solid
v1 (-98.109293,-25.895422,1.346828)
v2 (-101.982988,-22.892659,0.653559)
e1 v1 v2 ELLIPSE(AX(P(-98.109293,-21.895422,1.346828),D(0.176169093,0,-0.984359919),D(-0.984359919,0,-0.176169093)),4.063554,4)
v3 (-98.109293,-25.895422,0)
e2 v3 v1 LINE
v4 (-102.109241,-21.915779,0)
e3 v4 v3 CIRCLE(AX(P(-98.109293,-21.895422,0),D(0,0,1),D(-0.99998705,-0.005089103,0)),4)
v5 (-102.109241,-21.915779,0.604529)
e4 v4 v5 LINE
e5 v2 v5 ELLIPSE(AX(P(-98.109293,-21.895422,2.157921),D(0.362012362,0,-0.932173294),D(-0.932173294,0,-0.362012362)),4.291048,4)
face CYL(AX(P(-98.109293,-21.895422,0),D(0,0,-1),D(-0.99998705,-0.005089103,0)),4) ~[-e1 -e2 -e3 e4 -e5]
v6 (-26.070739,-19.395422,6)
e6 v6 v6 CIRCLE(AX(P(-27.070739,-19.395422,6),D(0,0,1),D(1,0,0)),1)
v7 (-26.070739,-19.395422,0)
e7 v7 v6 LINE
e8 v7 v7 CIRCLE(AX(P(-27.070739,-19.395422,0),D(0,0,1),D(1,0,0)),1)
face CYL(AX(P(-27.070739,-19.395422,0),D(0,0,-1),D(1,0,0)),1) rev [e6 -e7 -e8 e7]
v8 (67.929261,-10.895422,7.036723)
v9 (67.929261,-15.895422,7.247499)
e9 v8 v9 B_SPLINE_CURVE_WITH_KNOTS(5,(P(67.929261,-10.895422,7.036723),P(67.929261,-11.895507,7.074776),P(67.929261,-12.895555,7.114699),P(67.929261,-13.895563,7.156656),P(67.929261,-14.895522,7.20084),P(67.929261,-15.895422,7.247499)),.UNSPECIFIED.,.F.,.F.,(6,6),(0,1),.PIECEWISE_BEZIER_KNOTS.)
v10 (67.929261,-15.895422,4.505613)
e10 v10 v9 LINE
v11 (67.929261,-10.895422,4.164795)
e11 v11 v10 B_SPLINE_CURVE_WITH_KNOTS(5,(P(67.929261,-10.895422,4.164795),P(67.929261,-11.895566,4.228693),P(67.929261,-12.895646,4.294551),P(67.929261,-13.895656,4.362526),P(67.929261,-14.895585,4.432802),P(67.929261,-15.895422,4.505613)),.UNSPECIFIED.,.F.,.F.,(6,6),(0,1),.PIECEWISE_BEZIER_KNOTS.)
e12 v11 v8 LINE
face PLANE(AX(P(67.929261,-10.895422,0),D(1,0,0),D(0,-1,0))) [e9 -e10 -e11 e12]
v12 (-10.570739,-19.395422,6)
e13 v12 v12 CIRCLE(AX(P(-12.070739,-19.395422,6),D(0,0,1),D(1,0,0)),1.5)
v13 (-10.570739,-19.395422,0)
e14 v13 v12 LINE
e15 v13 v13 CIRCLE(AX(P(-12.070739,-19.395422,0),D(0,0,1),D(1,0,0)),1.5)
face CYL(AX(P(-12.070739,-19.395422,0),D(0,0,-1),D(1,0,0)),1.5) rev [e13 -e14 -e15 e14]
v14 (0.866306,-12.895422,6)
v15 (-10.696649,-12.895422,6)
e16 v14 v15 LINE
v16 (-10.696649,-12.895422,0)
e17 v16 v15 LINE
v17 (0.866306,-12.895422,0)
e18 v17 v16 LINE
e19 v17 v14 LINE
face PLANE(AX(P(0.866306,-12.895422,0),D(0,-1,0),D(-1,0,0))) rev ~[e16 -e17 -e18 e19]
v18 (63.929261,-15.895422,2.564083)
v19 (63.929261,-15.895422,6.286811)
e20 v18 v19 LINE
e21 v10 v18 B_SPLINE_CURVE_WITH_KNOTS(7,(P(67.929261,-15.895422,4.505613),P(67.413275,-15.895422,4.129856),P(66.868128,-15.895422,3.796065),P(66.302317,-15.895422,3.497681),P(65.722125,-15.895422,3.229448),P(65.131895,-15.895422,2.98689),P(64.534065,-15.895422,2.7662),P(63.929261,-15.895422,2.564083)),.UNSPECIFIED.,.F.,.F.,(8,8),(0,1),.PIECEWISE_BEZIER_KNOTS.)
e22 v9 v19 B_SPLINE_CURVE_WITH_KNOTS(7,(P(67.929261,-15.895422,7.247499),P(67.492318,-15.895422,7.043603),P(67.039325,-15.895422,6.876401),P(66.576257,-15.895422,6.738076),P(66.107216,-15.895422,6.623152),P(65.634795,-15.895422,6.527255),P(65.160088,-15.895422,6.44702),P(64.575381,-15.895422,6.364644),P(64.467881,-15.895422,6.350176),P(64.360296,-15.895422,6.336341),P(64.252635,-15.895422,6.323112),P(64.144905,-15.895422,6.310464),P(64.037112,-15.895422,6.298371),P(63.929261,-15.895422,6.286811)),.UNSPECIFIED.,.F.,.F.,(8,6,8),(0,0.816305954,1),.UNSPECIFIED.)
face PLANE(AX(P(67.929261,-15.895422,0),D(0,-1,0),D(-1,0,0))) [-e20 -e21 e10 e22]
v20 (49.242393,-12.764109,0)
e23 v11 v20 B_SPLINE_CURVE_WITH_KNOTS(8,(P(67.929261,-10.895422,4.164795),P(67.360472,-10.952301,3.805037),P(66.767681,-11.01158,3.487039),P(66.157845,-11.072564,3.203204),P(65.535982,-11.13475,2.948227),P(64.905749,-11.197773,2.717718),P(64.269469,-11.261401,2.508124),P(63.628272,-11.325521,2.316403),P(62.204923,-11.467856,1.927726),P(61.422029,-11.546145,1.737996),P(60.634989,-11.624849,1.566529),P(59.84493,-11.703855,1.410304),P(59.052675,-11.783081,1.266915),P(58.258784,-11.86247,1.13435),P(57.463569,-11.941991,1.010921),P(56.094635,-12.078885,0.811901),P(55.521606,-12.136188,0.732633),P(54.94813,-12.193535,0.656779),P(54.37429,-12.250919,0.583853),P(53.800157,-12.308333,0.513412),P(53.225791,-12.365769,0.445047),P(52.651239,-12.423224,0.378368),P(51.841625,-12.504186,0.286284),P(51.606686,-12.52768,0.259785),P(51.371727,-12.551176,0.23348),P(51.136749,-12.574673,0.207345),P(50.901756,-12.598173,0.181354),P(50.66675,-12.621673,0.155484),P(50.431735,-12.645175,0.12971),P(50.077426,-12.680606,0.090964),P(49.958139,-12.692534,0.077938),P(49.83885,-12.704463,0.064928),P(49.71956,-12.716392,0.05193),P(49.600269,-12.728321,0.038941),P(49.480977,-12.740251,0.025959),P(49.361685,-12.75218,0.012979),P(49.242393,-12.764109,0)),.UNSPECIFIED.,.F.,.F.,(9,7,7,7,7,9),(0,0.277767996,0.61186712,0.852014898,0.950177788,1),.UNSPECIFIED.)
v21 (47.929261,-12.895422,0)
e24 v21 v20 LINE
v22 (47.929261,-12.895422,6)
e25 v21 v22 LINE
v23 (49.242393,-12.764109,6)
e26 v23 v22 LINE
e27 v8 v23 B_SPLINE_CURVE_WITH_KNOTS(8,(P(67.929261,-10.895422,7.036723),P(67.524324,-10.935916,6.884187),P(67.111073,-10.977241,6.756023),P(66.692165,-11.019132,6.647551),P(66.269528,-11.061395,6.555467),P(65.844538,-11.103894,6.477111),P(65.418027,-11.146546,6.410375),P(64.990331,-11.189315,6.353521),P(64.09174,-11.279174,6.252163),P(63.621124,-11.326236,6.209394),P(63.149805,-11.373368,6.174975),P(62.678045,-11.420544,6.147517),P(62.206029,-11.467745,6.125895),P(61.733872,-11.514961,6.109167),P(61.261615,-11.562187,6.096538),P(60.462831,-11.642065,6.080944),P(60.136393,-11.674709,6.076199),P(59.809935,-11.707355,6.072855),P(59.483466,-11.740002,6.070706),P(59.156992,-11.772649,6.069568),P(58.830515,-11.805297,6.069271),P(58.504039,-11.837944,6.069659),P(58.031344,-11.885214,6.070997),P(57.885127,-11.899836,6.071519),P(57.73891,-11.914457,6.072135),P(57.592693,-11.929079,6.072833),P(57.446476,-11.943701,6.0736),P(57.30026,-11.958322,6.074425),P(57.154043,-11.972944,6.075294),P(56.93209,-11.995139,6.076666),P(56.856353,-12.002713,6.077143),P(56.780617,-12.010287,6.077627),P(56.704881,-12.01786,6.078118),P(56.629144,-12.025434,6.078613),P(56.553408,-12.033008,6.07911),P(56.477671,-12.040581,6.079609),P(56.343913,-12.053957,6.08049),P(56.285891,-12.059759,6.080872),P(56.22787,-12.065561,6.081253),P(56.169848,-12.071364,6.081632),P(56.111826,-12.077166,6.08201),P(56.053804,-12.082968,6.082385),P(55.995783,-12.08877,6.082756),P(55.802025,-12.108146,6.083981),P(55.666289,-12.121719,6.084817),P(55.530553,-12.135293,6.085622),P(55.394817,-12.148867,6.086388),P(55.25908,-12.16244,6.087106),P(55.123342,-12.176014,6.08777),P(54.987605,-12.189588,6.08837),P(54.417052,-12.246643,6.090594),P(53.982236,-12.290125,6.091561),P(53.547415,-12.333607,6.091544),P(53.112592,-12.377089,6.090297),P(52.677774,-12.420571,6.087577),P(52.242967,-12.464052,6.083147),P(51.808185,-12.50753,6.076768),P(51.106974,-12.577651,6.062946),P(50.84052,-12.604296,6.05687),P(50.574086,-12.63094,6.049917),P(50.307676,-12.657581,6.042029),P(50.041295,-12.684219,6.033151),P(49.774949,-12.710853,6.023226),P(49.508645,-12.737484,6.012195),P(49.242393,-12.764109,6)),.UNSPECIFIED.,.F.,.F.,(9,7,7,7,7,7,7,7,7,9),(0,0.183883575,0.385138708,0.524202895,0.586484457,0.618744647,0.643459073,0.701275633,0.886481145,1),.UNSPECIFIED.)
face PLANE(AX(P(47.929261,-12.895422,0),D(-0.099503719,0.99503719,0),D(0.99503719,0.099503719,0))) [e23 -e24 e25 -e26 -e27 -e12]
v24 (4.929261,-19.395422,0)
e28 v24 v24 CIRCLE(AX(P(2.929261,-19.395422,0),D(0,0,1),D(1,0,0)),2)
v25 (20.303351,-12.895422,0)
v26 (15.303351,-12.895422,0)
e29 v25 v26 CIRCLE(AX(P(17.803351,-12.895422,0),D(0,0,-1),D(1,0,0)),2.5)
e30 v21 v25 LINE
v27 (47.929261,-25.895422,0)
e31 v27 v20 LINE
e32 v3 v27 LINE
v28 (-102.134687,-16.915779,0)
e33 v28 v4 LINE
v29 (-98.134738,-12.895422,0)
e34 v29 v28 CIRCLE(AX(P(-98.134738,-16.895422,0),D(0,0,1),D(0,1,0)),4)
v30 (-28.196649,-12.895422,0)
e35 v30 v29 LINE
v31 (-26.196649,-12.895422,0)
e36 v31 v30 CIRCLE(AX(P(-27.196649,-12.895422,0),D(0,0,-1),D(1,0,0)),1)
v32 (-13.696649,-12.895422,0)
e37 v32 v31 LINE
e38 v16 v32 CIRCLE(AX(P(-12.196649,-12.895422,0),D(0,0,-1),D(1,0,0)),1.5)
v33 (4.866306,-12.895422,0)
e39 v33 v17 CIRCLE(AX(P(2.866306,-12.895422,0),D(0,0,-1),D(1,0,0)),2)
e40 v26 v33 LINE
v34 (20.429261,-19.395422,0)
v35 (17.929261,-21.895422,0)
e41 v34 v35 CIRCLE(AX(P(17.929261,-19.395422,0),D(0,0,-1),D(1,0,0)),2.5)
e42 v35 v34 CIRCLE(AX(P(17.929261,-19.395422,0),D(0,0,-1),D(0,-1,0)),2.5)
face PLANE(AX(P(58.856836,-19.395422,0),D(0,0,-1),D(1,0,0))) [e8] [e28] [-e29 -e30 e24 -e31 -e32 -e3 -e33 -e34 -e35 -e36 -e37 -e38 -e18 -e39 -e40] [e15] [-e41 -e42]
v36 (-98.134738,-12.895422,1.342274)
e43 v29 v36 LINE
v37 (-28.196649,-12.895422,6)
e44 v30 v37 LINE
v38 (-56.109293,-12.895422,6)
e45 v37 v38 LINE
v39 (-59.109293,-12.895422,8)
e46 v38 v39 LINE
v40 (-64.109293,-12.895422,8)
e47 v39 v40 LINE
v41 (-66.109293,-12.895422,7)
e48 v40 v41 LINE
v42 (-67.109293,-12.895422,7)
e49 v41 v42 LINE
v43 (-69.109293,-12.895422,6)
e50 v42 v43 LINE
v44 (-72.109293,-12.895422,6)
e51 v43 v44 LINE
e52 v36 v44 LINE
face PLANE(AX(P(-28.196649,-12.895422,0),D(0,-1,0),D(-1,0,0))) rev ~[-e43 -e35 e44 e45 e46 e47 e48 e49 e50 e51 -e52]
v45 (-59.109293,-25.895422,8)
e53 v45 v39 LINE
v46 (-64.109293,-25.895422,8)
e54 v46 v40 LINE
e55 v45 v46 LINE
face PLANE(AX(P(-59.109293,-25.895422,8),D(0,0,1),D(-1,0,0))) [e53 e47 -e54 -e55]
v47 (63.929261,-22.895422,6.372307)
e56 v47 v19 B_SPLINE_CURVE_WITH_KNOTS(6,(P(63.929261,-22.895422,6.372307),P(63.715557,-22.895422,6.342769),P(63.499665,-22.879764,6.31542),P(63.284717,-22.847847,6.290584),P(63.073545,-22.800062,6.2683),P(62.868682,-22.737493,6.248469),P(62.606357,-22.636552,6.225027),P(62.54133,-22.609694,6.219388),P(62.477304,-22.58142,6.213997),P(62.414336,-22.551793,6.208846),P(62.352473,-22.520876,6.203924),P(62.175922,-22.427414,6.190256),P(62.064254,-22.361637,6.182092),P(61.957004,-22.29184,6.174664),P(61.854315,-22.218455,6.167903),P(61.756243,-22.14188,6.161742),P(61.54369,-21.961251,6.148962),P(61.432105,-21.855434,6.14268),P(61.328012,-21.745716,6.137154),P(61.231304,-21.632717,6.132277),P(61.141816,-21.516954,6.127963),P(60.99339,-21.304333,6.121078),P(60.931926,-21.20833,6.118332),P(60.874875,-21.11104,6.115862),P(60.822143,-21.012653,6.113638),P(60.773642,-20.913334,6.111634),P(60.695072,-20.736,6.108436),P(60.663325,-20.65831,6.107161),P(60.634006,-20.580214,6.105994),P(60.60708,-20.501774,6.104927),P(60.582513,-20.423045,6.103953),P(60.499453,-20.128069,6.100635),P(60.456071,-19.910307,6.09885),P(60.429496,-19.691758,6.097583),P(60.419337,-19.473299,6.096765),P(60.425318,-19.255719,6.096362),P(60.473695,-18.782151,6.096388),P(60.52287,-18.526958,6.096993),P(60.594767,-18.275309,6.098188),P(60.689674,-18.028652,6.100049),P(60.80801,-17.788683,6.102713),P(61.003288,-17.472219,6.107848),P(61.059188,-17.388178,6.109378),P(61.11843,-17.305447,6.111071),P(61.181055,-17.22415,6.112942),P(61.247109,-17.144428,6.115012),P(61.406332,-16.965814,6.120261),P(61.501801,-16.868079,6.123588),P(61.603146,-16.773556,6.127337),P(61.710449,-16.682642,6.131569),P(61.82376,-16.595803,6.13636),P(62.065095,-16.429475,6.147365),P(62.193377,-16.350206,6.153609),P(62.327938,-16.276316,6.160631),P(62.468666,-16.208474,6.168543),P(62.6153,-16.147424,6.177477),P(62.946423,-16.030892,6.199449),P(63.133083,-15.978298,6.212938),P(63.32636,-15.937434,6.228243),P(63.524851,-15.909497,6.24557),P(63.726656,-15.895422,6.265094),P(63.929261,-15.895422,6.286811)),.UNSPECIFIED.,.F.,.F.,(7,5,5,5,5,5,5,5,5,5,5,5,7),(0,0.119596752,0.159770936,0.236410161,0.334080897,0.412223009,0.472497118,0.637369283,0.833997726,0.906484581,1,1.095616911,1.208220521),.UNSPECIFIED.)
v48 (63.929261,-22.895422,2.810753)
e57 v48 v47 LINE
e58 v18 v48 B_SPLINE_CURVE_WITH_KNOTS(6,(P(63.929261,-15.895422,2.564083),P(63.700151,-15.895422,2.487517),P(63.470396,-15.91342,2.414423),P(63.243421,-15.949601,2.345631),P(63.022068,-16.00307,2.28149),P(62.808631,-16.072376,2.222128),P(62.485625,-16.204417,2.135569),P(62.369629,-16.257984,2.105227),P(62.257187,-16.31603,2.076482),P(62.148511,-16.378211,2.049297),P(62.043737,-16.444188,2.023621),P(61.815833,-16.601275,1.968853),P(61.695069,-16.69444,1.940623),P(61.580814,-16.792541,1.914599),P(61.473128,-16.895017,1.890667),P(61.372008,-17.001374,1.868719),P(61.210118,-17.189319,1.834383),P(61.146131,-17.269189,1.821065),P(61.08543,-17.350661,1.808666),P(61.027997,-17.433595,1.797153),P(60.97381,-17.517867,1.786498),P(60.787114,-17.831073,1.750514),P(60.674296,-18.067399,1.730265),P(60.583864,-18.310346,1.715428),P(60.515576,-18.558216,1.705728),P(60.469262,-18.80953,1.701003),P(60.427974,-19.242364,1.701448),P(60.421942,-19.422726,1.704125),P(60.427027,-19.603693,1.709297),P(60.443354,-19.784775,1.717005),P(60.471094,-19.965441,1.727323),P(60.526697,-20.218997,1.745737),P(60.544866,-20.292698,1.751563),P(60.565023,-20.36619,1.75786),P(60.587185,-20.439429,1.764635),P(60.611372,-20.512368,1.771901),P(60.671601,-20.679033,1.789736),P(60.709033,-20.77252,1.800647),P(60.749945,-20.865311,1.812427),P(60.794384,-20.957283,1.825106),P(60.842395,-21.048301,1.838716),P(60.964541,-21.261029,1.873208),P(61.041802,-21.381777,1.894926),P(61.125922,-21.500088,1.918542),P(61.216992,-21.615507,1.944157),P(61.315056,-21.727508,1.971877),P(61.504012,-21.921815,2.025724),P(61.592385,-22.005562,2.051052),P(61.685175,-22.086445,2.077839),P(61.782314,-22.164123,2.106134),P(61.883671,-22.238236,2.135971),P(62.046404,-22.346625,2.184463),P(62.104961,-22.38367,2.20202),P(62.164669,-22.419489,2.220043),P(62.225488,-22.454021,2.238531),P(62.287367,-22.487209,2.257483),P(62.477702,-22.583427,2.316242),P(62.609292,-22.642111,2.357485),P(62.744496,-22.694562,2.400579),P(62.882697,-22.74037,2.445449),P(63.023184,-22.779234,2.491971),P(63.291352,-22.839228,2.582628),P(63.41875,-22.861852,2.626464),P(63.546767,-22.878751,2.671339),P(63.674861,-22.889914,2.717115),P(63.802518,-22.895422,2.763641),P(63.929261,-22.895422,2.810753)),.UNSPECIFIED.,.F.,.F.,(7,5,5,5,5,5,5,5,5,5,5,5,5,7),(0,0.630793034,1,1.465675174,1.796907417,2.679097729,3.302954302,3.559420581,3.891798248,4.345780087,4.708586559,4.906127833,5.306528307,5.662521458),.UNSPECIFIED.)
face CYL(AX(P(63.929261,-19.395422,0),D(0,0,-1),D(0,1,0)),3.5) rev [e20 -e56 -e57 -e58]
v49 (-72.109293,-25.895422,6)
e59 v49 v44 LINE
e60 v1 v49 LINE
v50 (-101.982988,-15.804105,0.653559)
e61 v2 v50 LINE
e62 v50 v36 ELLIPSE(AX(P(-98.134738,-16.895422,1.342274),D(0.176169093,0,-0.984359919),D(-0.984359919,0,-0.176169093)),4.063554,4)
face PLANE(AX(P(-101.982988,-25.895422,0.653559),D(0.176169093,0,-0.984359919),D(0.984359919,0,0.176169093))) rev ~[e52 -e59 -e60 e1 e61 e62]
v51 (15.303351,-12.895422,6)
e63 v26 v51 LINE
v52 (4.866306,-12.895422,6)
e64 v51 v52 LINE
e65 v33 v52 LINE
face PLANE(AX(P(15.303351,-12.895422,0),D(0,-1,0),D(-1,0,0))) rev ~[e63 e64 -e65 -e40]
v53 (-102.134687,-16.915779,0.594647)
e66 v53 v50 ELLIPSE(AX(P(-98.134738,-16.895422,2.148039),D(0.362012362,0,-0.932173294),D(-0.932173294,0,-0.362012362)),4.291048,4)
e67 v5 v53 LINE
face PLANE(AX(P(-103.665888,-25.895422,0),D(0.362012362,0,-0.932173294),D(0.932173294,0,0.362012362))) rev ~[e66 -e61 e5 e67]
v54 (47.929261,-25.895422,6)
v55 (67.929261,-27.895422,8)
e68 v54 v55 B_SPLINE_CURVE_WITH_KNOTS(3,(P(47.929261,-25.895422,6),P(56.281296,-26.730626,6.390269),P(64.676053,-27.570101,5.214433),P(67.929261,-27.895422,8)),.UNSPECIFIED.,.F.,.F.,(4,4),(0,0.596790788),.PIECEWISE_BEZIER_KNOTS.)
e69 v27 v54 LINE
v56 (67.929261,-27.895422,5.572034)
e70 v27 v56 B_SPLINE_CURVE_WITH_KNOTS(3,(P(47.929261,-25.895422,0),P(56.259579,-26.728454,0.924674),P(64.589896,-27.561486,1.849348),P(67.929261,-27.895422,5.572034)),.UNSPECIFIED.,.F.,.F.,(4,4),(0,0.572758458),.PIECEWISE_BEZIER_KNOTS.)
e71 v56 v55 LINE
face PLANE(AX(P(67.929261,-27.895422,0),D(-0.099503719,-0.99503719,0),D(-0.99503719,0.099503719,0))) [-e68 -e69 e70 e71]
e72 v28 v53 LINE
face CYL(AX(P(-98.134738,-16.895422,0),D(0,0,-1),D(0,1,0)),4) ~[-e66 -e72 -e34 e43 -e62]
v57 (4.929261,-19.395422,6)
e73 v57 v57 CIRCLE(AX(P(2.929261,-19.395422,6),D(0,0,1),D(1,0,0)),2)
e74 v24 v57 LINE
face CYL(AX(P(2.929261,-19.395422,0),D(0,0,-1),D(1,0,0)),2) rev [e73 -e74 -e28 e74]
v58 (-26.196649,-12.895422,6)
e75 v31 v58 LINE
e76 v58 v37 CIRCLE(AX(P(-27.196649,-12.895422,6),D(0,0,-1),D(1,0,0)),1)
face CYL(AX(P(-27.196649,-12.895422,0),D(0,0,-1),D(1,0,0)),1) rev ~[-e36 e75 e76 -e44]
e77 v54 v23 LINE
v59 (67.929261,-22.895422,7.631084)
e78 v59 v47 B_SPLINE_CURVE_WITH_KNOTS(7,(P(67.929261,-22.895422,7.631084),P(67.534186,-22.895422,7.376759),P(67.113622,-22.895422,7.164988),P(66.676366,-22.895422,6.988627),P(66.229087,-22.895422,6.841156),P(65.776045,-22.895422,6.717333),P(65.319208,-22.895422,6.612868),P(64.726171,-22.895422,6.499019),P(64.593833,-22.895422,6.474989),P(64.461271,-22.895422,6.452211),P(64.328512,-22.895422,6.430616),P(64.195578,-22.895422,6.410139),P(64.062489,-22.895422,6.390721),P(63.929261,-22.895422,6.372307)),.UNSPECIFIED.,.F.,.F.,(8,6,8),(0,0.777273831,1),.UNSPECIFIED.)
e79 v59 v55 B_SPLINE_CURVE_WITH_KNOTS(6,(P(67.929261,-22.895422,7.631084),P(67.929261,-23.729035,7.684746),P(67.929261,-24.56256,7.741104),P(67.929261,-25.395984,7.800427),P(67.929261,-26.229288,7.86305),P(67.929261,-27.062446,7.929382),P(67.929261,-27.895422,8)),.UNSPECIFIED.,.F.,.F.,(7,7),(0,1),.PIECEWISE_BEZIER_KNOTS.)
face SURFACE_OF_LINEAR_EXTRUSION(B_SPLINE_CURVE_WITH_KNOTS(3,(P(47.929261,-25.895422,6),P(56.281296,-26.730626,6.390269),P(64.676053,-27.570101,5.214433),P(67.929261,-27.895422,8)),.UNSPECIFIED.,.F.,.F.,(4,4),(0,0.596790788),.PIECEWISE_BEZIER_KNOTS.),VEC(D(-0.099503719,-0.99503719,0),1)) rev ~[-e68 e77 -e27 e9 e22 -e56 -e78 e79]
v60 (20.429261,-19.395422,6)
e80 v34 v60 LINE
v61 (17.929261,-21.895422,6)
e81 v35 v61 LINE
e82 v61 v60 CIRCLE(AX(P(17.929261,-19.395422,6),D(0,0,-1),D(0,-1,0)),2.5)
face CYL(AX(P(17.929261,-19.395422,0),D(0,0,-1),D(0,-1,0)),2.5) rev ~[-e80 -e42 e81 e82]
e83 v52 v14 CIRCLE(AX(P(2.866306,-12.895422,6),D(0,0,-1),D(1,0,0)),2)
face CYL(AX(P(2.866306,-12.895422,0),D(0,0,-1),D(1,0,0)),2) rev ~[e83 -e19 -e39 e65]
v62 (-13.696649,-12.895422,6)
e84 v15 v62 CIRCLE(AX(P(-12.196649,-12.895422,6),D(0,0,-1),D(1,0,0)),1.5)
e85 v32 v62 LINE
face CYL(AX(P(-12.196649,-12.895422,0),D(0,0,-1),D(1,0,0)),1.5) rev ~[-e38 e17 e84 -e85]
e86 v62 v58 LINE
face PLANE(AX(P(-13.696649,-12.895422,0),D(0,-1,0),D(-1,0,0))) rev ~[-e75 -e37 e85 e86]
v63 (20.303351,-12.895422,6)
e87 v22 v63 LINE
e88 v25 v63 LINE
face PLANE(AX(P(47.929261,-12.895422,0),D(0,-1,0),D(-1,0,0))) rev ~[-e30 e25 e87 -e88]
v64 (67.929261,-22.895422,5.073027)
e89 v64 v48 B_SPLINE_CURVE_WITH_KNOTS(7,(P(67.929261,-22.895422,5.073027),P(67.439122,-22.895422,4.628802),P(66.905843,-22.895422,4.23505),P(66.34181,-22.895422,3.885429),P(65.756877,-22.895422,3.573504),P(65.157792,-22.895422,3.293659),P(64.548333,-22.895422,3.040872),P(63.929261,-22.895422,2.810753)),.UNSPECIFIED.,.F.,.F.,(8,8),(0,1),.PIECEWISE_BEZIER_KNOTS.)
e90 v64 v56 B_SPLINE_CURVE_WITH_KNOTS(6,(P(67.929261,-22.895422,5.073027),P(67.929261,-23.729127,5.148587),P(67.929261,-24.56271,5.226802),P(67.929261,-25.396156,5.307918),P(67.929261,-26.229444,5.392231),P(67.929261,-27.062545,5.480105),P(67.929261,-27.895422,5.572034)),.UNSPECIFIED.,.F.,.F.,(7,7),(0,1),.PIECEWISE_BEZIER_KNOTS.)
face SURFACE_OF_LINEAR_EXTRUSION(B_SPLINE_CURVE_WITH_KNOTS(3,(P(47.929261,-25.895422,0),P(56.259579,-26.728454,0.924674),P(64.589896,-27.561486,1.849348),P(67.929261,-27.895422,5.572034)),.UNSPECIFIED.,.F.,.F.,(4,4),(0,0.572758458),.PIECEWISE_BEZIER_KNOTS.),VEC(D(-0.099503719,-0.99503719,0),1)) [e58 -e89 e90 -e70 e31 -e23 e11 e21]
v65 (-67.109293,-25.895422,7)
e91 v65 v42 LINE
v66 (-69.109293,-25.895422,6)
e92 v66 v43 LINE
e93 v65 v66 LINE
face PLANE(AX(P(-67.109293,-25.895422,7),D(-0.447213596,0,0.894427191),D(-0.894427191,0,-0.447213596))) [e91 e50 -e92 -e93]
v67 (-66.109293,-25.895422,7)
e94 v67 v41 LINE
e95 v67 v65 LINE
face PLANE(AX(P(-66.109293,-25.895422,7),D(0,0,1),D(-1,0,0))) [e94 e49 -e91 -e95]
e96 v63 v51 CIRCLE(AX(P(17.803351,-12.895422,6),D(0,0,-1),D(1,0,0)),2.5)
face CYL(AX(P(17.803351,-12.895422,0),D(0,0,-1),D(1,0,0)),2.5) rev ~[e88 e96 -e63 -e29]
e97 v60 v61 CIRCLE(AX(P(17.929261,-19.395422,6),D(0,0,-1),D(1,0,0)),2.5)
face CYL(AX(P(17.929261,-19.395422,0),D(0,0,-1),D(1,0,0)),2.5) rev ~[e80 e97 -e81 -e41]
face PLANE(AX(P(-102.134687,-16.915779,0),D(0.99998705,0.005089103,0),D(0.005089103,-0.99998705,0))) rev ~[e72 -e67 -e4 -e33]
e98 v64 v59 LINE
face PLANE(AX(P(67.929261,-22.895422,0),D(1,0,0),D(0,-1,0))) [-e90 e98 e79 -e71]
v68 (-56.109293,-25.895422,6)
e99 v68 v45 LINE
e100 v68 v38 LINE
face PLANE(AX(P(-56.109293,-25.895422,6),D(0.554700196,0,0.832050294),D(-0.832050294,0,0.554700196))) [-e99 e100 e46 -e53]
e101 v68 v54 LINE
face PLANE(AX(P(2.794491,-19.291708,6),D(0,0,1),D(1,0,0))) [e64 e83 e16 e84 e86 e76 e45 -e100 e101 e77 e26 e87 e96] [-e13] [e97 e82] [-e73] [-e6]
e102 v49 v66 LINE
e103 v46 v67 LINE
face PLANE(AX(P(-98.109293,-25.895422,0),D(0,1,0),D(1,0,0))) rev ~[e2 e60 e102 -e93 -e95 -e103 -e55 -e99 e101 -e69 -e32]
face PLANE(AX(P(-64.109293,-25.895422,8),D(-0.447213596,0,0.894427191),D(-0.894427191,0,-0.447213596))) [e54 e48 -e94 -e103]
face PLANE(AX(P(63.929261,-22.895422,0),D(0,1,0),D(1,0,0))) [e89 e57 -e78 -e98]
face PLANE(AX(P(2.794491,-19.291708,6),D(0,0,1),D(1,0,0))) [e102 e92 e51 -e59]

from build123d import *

# Parameters (mm, degrees)
F0_R     = 1
F0_R_2   = 1.5
F0_R_3   = 2
F1_DEPTH = 6
F3_DEPTH = 8
F5_DEPTH = 25
F7_DEPTH = 25
F9_DEPTH = 13


# Not quite as in the source:
# - a feature names something its author has since deleted; it is built from what else it names


with BuildPart() as f1:
    # F0 (on Top) → F1 (new body)
    with BuildSketch(Plane.XY):
        with BuildLine():
            Line((-42.1966487169, -12.8954221606), (-42.1966487169, -25.8954221606))
            Line((-42.1966487169, -25.8954221606), (17.9292613268, -25.8954221606))
            Line((17.9292613268, -25.8954221606), (47.9292613268, -25.8954221606))
            Line((47.9292613268, -25.8954221606), (47.9292613268, -12.8954221606))
            Line((47.9292613268, -12.8954221606), (20.3033512831, -12.8954221606))
            ThreePointArc((20.3033512831, -12.8954221606), (17.8033512831, -15.3954221606), (15.3033512831, -12.8954221606))
            Line((15.3033512831, -12.8954221606), (4.8663063049, -12.8954221606))
            ThreePointArc((4.8663063049, -12.8954221606), (2.8663063049, -14.8954221606), (0.8663063049, -12.8954221606))
            Line((0.8663063049, -12.8954221606), (-10.6966487169, -12.8954221606))
            ThreePointArc((-10.6966487169, -12.8954221606), (-12.1966487169, -14.3954221606), (-13.6966487169, -12.8954221606))
            Line((-13.6966487169, -12.8954221606), (-26.1966487169, -12.8954221606))
            ThreePointArc((-26.1966487169, -12.8954221606), (-27.1966487169, -13.8954221606), (-28.1966487169, -12.8954221606))
            Line((-28.1966487169, -12.8954221606), (-42.1966487169, -12.8954221606))
        make_face()
        with Locations((-27.0707386732, -19.3954221606)):
            Circle(F0_R, mode=Mode.SUBTRACT)
        with Locations((-12.0707386732, -19.3954221606)):
            Circle(F0_R_2, mode=Mode.SUBTRACT)
        with Locations((2.9292613268, -19.3954221606)):
            Circle(F0_R_3, mode=Mode.SUBTRACT)
        with BuildLine():
            ThreePointArc((20.4292613268, -19.3954221606), (19.6970282798, -21.1631891136), (17.9292613268, -21.8954221606))
            ThreePointArc((17.9292613268, -21.8954221606), (16.1614943738, -17.6276552077), (20.4292613268, -19.3954221606))
        make_face(mode=Mode.SUBTRACT)
        with BuildLine():
            ThreePointArc((-102.1092408178, -21.9157785711), (-100.9305134828, -24.7310372299), (-98.109292616, -25.8954221606))
            Line((-98.109292616, -25.8954221606), (-42.1966487169, -25.8954221606))
            Line((-42.1966487169, -25.8954221606), (-42.1966487169, -12.8954221606))
            Line((-42.1966487169, -12.8954221606), (-98.1347384587, -12.8954221606))
            ThreePointArc((-98.1347384587, -12.8954221606), (-100.9703535279, -14.0742012939), (-102.1346866604, -16.9157785711))
            Line((-102.1346866604, -16.9157785711), (-102.1092408178, -21.9157785711))
        make_face()
    extrude(amount=F1_DEPTH)

    # F2 (on face) → F3 (join)
    with BuildSketch(Plane(origin=(0, 0, 0), x_dir=(1, 0, 0), z_dir=(0, 0, -1))):
        with BuildLine():
            Line((47.9292613268, 25.8954221606), (47.9292613268, 12.8954221606))
            Line((47.9292613268, 12.8954221606), (67.9292613268, 10.8954221606))
            Line((67.9292613268, 10.8954221606), (67.9292613268, 15.8954221606))
            Line((67.9292613268, 15.8954221606), (63.9292613268, 15.8954221606))
            ThreePointArc((63.9292613268, 15.8954221606), (60.4292613268, 19.3954221606), (63.9292613268, 22.8954221606))
            Line((63.9292613268, 22.8954221606), (67.9292613268, 22.8954221606))
            Line((67.9292613268, 22.8954221606), (67.9292613268, 27.8954221606))
            Line((67.9292613268, 27.8954221606), (47.9292613268, 25.8954221606))
        make_face()
    extrude(amount=-F3_DEPTH)

    # F4 (on face) → F5 (cut)
    with BuildSketch(Plane(origin=(-2.0893560424, -20.8935604237, 0), x_dir=(0.9950371902, -0.099503719, 0), z_dir=(-0.099503719, -0.9950371902, 0))):
        with BuildLine():
            Line((47.7105565369, 6), (50.2680883301, 6))
            Line((50.2680883301, 6), (50.2680883301, 8))
            Line((50.2680883301, 8), (70.3678395723, 8))
            add(Edge.make_bspline(
                [(70.3678395723, 8), (72.5767643682, 9.8820103785), (72.4269967916, 13.5723014467), (72.296127677, 17.0164462179)],
                knots=[0.596790788, 0.596790788, 0.596790788, 0.596790788, 1, 1, 1, 1], degree=3))
            add(Edge.make_bspline(
                [(70.3678395723, 5.5720340461), (72.8712183365, 8.3489220533), (72.5836730067, 12.6826841356), (72.296127677, 17.0164462179)],
                knots=[0.5727584581, 0.5727584581, 0.5727584581, 0.5727584581, 1, 1, 1, 1], degree=3))
            Line((70.3678395723, 5.5720340461), (70.3678395723, 0))
            Line((70.3678395723, 0), (50.2680883301, 0))
            Line((50.2680883301, 0), (50.2680883301, -3.928697668))
            Line((50.2680883301, -3.928697668), (74.866913259, -3.928697668))
            Line((74.866913259, -3.928697668), (74.866913259, 21.5322930813))
            Line((74.866913259, 21.5322930813), (50.2680883301, 21.5322930813))
            Line((50.2680883301, 21.5322930813), (47.7105565369, 21.5322930813))
            Line((47.7105565369, 21.5322930813), (47.7105565369, 6))
        make_face()
        with BuildLine():
            Line((50.2680883301, 8), (50.2680883301, 6))
            add(Edge.make_bspline(
                [(50.2680883301, 6), (58.6617788579, 6.3902694532), (67.098405416, 5.2144325486), (70.3678395723, 8)],
                knots=[0, 0, 0, 0, 0.596790788, 0.596790788, 0.596790788, 0.596790788], degree=3))
            Line((70.3678395723, 8), (50.2680883301, 8))
        make_face()
        with BuildLine():
            add(Edge.make_bspline(
                [(50.2680883301, 0), (58.6399537153, 0.9246740387), (67.0118191006, 1.8493480774), (70.3678395723, 5.5720340461)],
                knots=[0, 0, 0, 0, 0.5727584581, 0.5727584581, 0.5727584581, 0.5727584581], degree=3))
            Line((50.2680883301, 0), (70.3678395723, 0))
            Line((70.3678395723, 0), (70.3678395723, 5.5720340461))
        make_face()
    extrude(amount=-F5_DEPTH, mode=Mode.SUBTRACT)

    # F6 (on face) → F7 (cut)
    with BuildSketch(Plane.XZ.offset(25.8954221606)):
        Polygon((-103.6658883095, 0), (-101.9829884171, 0.653559342), (-72.109292616, 6), (-72.109292616, 8.9457267895), (-103.4941226244, 6.6766636446), align=None)
    extrude(amount=-F7_DEPTH, mode=Mode.SUBTRACT)

    # F8 (on face) → F9 (join)
    with BuildSketch(Plane.XZ.offset(25.8954221606)):
        Polygon((-67.109292616, 7), (-69.109292616, 6), (-67.109292616, 6), (-56.109292616, 6), (-59.109292616, 8), (-64.109292616, 8), (-66.109292616, 7), align=None)
    extrude(amount=-F9_DEPTH)


solid = f1.part
